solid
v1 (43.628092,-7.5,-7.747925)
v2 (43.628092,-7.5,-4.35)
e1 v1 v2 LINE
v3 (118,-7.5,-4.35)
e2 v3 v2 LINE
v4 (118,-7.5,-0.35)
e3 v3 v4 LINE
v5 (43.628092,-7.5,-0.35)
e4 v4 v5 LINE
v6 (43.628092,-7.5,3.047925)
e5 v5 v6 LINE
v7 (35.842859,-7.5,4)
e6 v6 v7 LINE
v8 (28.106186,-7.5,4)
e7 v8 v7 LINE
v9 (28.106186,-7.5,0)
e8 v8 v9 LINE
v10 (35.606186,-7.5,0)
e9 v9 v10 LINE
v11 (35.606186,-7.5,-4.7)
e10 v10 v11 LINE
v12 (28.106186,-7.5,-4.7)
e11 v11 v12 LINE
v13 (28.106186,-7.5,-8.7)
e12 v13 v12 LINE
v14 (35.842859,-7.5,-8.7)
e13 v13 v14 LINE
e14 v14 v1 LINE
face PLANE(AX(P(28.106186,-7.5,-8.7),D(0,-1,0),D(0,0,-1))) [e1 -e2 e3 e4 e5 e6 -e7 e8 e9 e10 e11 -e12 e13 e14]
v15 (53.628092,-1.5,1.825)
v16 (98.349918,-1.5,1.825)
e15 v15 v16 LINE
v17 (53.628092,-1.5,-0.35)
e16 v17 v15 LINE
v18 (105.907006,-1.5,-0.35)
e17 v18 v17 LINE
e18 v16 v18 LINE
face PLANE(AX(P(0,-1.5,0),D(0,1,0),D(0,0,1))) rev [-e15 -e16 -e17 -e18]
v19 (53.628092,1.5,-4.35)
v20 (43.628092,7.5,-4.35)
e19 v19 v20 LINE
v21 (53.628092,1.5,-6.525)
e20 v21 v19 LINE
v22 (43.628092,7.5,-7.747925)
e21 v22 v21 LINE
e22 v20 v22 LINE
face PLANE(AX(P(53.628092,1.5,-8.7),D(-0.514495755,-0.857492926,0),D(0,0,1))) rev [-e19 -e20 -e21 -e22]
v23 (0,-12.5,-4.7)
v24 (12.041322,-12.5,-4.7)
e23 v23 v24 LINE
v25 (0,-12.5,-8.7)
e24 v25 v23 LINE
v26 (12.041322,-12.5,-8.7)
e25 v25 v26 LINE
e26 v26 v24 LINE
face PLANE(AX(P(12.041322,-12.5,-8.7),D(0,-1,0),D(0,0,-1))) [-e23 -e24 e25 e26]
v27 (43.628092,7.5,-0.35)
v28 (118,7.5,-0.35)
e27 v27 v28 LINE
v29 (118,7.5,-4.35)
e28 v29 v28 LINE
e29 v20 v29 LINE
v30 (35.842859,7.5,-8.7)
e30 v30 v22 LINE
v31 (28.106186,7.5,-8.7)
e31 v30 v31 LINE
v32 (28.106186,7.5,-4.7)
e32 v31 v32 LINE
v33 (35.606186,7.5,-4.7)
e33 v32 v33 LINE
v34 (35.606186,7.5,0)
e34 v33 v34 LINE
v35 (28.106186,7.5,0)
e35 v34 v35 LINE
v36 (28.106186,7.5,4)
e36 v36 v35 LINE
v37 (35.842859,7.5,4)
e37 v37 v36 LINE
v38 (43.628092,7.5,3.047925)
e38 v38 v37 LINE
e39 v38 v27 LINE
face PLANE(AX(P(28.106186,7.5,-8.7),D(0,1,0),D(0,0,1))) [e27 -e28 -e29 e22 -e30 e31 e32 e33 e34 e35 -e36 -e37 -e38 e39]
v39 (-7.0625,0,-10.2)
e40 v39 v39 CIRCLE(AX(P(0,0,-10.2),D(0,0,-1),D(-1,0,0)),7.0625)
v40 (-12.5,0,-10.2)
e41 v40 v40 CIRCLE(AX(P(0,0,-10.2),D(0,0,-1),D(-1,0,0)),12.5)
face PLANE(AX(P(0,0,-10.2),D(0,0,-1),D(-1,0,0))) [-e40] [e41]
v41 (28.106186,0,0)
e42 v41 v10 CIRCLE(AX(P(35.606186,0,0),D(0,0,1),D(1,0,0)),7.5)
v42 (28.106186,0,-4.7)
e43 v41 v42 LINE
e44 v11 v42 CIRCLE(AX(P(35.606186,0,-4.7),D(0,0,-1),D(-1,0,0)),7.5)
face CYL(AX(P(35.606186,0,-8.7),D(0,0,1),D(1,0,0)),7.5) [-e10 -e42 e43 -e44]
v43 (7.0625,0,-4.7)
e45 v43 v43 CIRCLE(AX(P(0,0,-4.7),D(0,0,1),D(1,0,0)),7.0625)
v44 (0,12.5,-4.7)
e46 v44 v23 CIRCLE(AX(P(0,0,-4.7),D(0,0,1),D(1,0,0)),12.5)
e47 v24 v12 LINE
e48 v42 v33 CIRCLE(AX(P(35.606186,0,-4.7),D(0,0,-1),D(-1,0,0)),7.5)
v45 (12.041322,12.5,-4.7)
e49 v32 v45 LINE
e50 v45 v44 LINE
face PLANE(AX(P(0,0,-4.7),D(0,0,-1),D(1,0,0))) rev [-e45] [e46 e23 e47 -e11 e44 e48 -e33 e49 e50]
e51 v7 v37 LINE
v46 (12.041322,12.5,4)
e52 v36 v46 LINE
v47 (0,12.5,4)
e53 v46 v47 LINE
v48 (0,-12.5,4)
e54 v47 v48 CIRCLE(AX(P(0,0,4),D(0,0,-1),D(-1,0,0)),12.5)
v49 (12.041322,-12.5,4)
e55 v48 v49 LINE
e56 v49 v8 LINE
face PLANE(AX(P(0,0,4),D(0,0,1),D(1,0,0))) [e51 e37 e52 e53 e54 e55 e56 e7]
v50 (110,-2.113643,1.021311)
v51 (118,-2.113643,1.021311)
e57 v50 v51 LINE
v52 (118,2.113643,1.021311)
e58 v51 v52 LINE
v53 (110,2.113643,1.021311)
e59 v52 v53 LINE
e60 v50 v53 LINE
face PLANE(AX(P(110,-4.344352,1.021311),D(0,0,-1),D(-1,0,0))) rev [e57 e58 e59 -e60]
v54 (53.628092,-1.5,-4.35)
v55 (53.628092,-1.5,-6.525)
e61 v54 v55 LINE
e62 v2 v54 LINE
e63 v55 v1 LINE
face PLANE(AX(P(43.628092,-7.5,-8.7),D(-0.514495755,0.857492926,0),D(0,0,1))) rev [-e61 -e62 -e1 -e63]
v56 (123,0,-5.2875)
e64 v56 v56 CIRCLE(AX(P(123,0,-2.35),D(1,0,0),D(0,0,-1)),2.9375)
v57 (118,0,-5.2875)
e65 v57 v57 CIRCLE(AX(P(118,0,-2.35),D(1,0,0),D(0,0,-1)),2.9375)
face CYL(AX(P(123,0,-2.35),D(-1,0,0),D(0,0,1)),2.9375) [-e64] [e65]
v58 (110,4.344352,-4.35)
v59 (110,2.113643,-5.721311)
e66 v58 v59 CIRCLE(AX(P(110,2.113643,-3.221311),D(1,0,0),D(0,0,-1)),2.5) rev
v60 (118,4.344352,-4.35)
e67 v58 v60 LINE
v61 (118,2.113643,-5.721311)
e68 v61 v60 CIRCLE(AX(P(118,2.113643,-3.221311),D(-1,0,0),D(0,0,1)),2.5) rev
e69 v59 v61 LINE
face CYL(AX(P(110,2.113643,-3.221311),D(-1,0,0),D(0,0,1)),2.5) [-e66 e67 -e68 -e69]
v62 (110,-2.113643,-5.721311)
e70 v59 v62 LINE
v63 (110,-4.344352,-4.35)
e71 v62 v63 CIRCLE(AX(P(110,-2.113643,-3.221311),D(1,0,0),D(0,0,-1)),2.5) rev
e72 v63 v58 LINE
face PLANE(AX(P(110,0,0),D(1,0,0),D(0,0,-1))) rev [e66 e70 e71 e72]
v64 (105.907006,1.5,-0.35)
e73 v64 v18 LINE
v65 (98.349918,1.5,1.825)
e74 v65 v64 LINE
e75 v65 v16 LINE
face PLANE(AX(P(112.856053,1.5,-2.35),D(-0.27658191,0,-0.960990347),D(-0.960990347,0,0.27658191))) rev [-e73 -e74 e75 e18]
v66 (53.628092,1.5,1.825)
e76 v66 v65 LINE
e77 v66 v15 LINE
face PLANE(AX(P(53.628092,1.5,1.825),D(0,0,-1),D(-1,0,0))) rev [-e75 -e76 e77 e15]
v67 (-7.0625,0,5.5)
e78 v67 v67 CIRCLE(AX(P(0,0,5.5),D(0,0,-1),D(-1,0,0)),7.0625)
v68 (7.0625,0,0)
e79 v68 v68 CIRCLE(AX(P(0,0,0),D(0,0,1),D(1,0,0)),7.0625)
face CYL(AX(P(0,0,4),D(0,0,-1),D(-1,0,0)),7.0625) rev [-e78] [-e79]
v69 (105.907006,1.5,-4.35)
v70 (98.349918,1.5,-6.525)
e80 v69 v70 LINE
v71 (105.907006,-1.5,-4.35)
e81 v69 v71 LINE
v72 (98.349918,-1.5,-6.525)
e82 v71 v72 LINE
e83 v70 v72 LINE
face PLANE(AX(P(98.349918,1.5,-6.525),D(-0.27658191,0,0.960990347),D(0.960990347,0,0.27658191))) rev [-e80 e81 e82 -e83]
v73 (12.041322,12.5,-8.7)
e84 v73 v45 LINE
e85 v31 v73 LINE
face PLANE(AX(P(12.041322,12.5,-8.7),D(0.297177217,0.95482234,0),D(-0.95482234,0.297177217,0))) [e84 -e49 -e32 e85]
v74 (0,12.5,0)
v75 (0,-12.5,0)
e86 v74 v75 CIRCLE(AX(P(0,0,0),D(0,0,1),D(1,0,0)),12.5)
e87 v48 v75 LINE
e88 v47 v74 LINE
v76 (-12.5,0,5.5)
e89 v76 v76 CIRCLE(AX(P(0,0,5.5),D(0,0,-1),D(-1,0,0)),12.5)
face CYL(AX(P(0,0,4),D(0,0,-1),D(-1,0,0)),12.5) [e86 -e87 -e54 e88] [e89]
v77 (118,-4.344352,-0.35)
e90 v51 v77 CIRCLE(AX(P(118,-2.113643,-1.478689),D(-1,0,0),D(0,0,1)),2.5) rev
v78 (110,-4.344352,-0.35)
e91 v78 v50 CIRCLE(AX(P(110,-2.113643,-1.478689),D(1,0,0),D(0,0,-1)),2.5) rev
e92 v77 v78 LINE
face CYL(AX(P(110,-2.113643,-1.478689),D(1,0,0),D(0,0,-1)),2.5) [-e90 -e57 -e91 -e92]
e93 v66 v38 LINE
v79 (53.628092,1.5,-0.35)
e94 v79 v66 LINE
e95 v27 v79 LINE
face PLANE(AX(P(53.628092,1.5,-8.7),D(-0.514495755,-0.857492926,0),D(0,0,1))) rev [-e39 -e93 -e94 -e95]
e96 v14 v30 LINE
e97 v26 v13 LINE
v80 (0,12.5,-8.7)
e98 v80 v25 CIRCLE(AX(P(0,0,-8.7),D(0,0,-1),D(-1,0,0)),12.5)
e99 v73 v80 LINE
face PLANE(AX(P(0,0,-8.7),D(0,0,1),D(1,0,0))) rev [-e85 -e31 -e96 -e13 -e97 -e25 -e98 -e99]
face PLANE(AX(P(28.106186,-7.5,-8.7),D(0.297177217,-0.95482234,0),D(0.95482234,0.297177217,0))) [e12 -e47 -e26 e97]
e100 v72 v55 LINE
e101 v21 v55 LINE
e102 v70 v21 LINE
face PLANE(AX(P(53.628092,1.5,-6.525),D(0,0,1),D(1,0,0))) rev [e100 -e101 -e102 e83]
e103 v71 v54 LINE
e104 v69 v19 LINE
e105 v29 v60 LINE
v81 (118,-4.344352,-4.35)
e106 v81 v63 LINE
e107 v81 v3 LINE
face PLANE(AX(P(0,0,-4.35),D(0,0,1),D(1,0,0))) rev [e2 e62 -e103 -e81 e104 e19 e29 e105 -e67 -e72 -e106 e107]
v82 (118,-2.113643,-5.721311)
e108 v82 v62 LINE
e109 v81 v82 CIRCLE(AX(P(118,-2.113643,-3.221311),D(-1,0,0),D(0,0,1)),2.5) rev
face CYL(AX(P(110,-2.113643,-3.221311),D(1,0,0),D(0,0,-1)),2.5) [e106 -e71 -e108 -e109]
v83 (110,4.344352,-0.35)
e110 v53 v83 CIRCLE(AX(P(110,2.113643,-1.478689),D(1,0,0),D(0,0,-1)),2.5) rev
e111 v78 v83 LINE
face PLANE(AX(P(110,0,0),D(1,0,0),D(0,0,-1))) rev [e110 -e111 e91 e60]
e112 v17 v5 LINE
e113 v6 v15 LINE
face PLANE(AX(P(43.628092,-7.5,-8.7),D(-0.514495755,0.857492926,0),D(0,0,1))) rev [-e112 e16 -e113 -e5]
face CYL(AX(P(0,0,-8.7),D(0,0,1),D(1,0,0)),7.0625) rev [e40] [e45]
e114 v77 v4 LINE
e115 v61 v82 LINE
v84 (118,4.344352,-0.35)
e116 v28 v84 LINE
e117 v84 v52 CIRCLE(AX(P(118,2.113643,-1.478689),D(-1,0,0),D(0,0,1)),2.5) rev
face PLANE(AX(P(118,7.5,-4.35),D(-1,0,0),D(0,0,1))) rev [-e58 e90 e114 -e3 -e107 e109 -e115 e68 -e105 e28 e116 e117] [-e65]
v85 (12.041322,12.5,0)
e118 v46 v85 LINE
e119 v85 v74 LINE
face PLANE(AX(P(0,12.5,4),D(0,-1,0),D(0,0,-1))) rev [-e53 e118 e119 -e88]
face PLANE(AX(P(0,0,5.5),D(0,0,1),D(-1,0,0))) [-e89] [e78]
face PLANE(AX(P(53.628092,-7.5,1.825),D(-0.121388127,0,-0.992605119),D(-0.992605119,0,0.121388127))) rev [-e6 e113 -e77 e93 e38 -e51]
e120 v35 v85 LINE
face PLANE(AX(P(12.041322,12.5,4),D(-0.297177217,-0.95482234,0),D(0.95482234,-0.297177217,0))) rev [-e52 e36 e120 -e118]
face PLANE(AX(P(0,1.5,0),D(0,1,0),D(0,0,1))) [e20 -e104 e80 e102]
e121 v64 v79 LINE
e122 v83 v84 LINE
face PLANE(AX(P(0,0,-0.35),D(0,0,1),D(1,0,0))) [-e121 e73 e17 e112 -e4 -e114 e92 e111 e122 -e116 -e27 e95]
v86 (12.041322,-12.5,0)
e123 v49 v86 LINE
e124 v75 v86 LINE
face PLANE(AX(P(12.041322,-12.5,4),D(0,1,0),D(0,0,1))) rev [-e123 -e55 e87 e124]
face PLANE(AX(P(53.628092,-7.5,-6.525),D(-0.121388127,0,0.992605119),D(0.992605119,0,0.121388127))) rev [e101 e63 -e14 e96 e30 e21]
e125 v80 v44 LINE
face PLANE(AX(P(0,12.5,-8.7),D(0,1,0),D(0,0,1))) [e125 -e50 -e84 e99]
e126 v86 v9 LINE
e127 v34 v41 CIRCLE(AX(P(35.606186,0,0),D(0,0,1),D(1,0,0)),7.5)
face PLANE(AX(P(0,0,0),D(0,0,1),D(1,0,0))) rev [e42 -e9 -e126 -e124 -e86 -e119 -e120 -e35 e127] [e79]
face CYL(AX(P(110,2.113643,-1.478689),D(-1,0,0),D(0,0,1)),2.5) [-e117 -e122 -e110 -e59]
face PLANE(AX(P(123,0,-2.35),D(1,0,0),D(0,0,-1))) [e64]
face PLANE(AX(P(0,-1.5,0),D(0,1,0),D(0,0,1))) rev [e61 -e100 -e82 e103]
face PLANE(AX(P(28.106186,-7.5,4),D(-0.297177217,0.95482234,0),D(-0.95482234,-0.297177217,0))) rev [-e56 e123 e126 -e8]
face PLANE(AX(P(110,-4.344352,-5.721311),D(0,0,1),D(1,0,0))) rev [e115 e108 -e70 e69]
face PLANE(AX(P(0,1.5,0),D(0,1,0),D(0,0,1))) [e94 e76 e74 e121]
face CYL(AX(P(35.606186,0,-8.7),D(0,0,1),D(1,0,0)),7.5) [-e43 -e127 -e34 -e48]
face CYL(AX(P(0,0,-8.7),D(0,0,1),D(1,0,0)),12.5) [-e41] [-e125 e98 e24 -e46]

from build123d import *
from OCP.BRepFilletAPI import BRepFilletAPI_MakeChamfer
from build123d.topology import SkipClean

# Parameters (mm, degrees)
SKETCH1_R           = 7.0625
BOSS_EXTRUDE1_DEPTH = 4
SKETCH5_W           = 25.521905645
SKETCH5_H           = 15
BOSS_EXTRUDE2_DEPTH = 12.7
FILLET1_R           = 7.5
SKETCH6_W           = 64.371907972
SKETCH6_H           = 15
BOSS_EXTRUDE3_DEPTH = 2
CHAMFER1_SIZE       = 10
CHAMFER1_SIZE2      = 6
CHAMFER2_SIZE       = 6
CHAMFER2_SIZE2      = 10
SKETCH8_R           = 2.9375
BOSS_EXTRUDE4_DEPTH = 5
BOSS_EXTRUDE5_DEPTH = 1.5
CUT_EXTRUDE1_DEPTH  = 7.5
SKETCH11_W          = 6.742622272
SKETCH11_H          = 8.688704154
BOSS_EXTRUDE7_DEPTH = 8
FILLET2_R           = 2.5
SKETCH12_R          = 12.5
SKETCH12_R_2        = 7.0625
BOSS_EXTRUDE8_DEPTH = 1.5


# Some blends are built 0.0001 mm under size
with BuildPart() as part:
    # Sketch1 → Boss-Extrude1 (new body)
    with BuildSketch(Plane.XY):
        with BuildLine():
            Line((0, 12.5), (12.041321952, 12.5))
            Line((12.041321952, 12.5), (28.106186383, 7.5))
            Line((28.106186383, 7.5), (28.106186383, -7.5))
            Line((28.106186383, -7.5), (12.041321952, -12.5))
            Line((12.041321952, -12.5), (0, -12.5))
            ThreePointArc((0, -12.5), (-12.5, 0), (0, 12.5))
        make_face()
        Circle(SKETCH1_R, mode=Mode.SUBTRACT)
    boss_extrude1 = extrude(amount=BOSS_EXTRUDE1_DEPTH)

    # Sketch5 → Boss-Extrude2 (add)
    with BuildSketch(Plane.XY.offset(4)):
        with Locations((40.867139206, 0)):
            Rectangle(SKETCH5_W, SKETCH5_H)
    extrude(amount=-BOSS_EXTRUDE2_DEPTH)

    # Mirror1: Boss-Extrude1 across plane
    add(boss_extrude1.mirror(Plane(origin=(0, 0, -2.35), x_dir=(1, 0, 0), z_dir=(0, 0, -1))))

    # Fillet1
    fillet1_edges = [part.edges().sort_by_distance(p)[0] for p in [
        (28.106186383, -7.5, -2.35),
        (28.106186383, 7.5, -2.35),
    ]]
    fillet(fillet1_edges, radius=FILLET1_R - 0.0001)  # a hair under: the kernel refuses the full size

    # Sketch6 → Boss-Extrude3 (add, symmetric)
    with BuildSketch(Plane(origin=(0, 0, -2.35), x_dir=(-1, 0, 0), z_dir=(0, 0, -1))):
        with Locations((-85.814046014, 0)):
            Rectangle(SKETCH6_W, SKETCH6_H)
    extrude(amount=BOSS_EXTRUDE3_DEPTH, both=True)

    # Chamfer1
    chamfer1_edges = [part.edges().sort_by_distance(p)[0] for p in [
        (53.628092028, 7.5, -6.525),
        (53.628092028, 7.5, 1.825),
    ]]
    chamfer1_side = [part.faces().sort_by_distance(p)[0] for p in [
        (62.630754808, 7.5, -2.35),
    ]]
    chamfer(chamfer1_edges, length=CHAMFER1_SIZE, length2=CHAMFER1_SIZE2, reference=chamfer1_side[0])

    # Chamfer2: one chamfer whose edges measure the first distance from different faces: ONE call of the kernel's chamfer builder (chamfer() names one face for all edges)
    chamfer2_edges_1 = [part.edges().sort_by_distance(p)[0] for p in [
        (53.628092028, -7.5, -6.525),
    ]]
    chamfer2_side_1 = [part.faces().sort_by_distance(p)[0] for p in [
        (53.628092028, -3, -6.525),
    ]]
    chamfer2_edges_2 = [part.edges().sort_by_distance(p)[0] for p in [
        (53.628092028, -7.5, 1.825),
    ]]
    chamfer2_side_2 = [part.faces().sort_by_distance(p)[0] for p in [
        (53.628092028, -3, 1.825),
    ]]
    chamfer2 = BRepFilletAPI_MakeChamfer(part.part.solid().wrapped)
    for e in chamfer2_edges_1:
        chamfer2.Add(CHAMFER2_SIZE, CHAMFER2_SIZE2, e.wrapped, chamfer2_side_1[0].wrapped)  # the first distance lies on this face
    for e in chamfer2_edges_2:
        chamfer2.Add(CHAMFER2_SIZE, CHAMFER2_SIZE2, e.wrapped, chamfer2_side_2[0].wrapped)  # the first distance lies on this face
    add(Compound.cast(chamfer2.Shape()), mode=Mode.REPLACE)

    # Sketch8 → Boss-Extrude4 (add)
    with BuildSketch(Plane(origin=(118, 0, 0), x_dir=(0, 0, -1), z_dir=(1, 0, 0))):
        with Locations(Location((2.35, 0, 0), (0, 0, 132.910184022))):
            Circle(SKETCH8_R)
    extrude(amount=BOSS_EXTRUDE4_DEPTH)

    # Sketch9 → Boss-Extrude5 (add, symmetric)
    with BuildSketch(Plane(origin=(0, 0, 0), x_dir=(1, 0, 0), z_dir=(0, 1, 0))):
        Polygon((53.628092028, 6.525), (98.349917778, 6.525), (112.85605343, 2.35), (98.349917778, -1.825), (53.628092028, -1.825), align=None)
    extrude(amount=BOSS_EXTRUDE5_DEPTH, both=True)

    # Sketch10 → Cut-Extrude1 (cut, symmetric)
    with BuildSketch(Plane(origin=(0, 0, 0), x_dir=(1, 0, 0), z_dir=(0, 1, 0))):
        Polygon((53.628092028, 6.525), (35.842858925, 8.7), (53.628092028, 8.7), align=None)
        Polygon((53.628092028, -1.825), (35.842858925, -4), (53.628092028, -4), align=None)
    extrude(amount=CUT_EXTRUDE1_DEPTH, both=True, mode=Mode.SUBTRACT)

    # Sketch11 → Boss-Extrude7 (add)
    with BuildSketch(Plane.ZY.offset(-118)):
        with Locations((-2.35, 0)):
            Rectangle(SKETCH11_W, SKETCH11_H)
    extrude(amount=BOSS_EXTRUDE7_DEPTH)

    # Fillet2
    # the kernel refuses this fillet: 2.5 mm, written as the material it takes off along each edge
    with BuildSketch(Plane(origin=(123.576771831, 4.344352077, 1.021311136), x_dir=(0, -1, 0), z_dir=(-1, 0, 0)), Plane(origin=(123.576771831, -4.344352077, -5.721311136), x_dir=(0, 1, 0), z_dir=(-1, 0, 0))) as fillet2_piece_1:
        with BuildLine():
            CenterArc((2.230708732, -2.5), FILLET2_R, 90, 63.161607103)
            Line((0, -1.371311136), (-0.044614175, -1.348737359))
            ThreePointArc((-0.044614175, -1.348737359), (-0.05, -0.685655568), (-0.05, 0))
            Line((-0.05, 0), (0, 0.05))
            Line((0, 0.05), (2.230708732, 0.05))
            Line((2.230708732, 0.05), (2.230708732, 0))
        make_face()
    extrude(amount=19.153543662, mode=Mode.SUBTRACT)
    with BuildSketch(Plane(origin=(123.576771831, -4.344352077, 1.021311136), x_dir=(0, 0, -1), z_dir=(-1, 0, 0)), Plane(origin=(123.576771831, 4.344352077, -5.721311136), x_dir=(0, 0, 1), z_dir=(-1, 0, 0))) as fillet2_piece_2:
        with BuildLine():
            CenterArc((2.5, -2.230708732), FILLET2_R, 116.838392897, 63.161607103)
            Line((0, -2.230708732), (-0.05, -2.230708732))
            Line((-0.05, -2.230708732), (-0.05, 0))
            Line((-0.05, 0), (0, 0.05))
            ThreePointArc((0, 0.05), (0.685655568, 0.05), (1.348737359, 0.044614175))
            Line((1.348737359, 0.044614175), (1.371311136, 0))
        make_face()
    extrude(amount=19.153543662, mode=Mode.SUBTRACT)

    # Sketch12 → Boss-Extrude8 (add)
    with SkipClean():  # the faces are left unmerged after this step: merging them gives an invalid solid
        with BuildSketch(Plane(origin=(0, 0, -8.7), x_dir=(-1, 0, 0), z_dir=(0, 0, -1))):
            with Locations(Location((0, 0, 0), (0, 0, 90))):
                Circle(SKETCH12_R)
            with Locations(Location((0, 0, 0), (0, 0, 180))):
                Circle(SKETCH12_R_2, mode=Mode.SUBTRACT)
        boss_extrude8 = extrude(amount=BOSS_EXTRUDE8_DEPTH)

    # Mirror2: Boss-Extrude8 across plane
    with SkipClean():  # the faces are left unmerged after this step: merging them gives an invalid solid
        add(boss_extrude8.mirror(Plane(origin=(0, 0, -2.35), x_dir=(1, 0, 0), z_dir=(0, 0, -1))))


solid = part.part
